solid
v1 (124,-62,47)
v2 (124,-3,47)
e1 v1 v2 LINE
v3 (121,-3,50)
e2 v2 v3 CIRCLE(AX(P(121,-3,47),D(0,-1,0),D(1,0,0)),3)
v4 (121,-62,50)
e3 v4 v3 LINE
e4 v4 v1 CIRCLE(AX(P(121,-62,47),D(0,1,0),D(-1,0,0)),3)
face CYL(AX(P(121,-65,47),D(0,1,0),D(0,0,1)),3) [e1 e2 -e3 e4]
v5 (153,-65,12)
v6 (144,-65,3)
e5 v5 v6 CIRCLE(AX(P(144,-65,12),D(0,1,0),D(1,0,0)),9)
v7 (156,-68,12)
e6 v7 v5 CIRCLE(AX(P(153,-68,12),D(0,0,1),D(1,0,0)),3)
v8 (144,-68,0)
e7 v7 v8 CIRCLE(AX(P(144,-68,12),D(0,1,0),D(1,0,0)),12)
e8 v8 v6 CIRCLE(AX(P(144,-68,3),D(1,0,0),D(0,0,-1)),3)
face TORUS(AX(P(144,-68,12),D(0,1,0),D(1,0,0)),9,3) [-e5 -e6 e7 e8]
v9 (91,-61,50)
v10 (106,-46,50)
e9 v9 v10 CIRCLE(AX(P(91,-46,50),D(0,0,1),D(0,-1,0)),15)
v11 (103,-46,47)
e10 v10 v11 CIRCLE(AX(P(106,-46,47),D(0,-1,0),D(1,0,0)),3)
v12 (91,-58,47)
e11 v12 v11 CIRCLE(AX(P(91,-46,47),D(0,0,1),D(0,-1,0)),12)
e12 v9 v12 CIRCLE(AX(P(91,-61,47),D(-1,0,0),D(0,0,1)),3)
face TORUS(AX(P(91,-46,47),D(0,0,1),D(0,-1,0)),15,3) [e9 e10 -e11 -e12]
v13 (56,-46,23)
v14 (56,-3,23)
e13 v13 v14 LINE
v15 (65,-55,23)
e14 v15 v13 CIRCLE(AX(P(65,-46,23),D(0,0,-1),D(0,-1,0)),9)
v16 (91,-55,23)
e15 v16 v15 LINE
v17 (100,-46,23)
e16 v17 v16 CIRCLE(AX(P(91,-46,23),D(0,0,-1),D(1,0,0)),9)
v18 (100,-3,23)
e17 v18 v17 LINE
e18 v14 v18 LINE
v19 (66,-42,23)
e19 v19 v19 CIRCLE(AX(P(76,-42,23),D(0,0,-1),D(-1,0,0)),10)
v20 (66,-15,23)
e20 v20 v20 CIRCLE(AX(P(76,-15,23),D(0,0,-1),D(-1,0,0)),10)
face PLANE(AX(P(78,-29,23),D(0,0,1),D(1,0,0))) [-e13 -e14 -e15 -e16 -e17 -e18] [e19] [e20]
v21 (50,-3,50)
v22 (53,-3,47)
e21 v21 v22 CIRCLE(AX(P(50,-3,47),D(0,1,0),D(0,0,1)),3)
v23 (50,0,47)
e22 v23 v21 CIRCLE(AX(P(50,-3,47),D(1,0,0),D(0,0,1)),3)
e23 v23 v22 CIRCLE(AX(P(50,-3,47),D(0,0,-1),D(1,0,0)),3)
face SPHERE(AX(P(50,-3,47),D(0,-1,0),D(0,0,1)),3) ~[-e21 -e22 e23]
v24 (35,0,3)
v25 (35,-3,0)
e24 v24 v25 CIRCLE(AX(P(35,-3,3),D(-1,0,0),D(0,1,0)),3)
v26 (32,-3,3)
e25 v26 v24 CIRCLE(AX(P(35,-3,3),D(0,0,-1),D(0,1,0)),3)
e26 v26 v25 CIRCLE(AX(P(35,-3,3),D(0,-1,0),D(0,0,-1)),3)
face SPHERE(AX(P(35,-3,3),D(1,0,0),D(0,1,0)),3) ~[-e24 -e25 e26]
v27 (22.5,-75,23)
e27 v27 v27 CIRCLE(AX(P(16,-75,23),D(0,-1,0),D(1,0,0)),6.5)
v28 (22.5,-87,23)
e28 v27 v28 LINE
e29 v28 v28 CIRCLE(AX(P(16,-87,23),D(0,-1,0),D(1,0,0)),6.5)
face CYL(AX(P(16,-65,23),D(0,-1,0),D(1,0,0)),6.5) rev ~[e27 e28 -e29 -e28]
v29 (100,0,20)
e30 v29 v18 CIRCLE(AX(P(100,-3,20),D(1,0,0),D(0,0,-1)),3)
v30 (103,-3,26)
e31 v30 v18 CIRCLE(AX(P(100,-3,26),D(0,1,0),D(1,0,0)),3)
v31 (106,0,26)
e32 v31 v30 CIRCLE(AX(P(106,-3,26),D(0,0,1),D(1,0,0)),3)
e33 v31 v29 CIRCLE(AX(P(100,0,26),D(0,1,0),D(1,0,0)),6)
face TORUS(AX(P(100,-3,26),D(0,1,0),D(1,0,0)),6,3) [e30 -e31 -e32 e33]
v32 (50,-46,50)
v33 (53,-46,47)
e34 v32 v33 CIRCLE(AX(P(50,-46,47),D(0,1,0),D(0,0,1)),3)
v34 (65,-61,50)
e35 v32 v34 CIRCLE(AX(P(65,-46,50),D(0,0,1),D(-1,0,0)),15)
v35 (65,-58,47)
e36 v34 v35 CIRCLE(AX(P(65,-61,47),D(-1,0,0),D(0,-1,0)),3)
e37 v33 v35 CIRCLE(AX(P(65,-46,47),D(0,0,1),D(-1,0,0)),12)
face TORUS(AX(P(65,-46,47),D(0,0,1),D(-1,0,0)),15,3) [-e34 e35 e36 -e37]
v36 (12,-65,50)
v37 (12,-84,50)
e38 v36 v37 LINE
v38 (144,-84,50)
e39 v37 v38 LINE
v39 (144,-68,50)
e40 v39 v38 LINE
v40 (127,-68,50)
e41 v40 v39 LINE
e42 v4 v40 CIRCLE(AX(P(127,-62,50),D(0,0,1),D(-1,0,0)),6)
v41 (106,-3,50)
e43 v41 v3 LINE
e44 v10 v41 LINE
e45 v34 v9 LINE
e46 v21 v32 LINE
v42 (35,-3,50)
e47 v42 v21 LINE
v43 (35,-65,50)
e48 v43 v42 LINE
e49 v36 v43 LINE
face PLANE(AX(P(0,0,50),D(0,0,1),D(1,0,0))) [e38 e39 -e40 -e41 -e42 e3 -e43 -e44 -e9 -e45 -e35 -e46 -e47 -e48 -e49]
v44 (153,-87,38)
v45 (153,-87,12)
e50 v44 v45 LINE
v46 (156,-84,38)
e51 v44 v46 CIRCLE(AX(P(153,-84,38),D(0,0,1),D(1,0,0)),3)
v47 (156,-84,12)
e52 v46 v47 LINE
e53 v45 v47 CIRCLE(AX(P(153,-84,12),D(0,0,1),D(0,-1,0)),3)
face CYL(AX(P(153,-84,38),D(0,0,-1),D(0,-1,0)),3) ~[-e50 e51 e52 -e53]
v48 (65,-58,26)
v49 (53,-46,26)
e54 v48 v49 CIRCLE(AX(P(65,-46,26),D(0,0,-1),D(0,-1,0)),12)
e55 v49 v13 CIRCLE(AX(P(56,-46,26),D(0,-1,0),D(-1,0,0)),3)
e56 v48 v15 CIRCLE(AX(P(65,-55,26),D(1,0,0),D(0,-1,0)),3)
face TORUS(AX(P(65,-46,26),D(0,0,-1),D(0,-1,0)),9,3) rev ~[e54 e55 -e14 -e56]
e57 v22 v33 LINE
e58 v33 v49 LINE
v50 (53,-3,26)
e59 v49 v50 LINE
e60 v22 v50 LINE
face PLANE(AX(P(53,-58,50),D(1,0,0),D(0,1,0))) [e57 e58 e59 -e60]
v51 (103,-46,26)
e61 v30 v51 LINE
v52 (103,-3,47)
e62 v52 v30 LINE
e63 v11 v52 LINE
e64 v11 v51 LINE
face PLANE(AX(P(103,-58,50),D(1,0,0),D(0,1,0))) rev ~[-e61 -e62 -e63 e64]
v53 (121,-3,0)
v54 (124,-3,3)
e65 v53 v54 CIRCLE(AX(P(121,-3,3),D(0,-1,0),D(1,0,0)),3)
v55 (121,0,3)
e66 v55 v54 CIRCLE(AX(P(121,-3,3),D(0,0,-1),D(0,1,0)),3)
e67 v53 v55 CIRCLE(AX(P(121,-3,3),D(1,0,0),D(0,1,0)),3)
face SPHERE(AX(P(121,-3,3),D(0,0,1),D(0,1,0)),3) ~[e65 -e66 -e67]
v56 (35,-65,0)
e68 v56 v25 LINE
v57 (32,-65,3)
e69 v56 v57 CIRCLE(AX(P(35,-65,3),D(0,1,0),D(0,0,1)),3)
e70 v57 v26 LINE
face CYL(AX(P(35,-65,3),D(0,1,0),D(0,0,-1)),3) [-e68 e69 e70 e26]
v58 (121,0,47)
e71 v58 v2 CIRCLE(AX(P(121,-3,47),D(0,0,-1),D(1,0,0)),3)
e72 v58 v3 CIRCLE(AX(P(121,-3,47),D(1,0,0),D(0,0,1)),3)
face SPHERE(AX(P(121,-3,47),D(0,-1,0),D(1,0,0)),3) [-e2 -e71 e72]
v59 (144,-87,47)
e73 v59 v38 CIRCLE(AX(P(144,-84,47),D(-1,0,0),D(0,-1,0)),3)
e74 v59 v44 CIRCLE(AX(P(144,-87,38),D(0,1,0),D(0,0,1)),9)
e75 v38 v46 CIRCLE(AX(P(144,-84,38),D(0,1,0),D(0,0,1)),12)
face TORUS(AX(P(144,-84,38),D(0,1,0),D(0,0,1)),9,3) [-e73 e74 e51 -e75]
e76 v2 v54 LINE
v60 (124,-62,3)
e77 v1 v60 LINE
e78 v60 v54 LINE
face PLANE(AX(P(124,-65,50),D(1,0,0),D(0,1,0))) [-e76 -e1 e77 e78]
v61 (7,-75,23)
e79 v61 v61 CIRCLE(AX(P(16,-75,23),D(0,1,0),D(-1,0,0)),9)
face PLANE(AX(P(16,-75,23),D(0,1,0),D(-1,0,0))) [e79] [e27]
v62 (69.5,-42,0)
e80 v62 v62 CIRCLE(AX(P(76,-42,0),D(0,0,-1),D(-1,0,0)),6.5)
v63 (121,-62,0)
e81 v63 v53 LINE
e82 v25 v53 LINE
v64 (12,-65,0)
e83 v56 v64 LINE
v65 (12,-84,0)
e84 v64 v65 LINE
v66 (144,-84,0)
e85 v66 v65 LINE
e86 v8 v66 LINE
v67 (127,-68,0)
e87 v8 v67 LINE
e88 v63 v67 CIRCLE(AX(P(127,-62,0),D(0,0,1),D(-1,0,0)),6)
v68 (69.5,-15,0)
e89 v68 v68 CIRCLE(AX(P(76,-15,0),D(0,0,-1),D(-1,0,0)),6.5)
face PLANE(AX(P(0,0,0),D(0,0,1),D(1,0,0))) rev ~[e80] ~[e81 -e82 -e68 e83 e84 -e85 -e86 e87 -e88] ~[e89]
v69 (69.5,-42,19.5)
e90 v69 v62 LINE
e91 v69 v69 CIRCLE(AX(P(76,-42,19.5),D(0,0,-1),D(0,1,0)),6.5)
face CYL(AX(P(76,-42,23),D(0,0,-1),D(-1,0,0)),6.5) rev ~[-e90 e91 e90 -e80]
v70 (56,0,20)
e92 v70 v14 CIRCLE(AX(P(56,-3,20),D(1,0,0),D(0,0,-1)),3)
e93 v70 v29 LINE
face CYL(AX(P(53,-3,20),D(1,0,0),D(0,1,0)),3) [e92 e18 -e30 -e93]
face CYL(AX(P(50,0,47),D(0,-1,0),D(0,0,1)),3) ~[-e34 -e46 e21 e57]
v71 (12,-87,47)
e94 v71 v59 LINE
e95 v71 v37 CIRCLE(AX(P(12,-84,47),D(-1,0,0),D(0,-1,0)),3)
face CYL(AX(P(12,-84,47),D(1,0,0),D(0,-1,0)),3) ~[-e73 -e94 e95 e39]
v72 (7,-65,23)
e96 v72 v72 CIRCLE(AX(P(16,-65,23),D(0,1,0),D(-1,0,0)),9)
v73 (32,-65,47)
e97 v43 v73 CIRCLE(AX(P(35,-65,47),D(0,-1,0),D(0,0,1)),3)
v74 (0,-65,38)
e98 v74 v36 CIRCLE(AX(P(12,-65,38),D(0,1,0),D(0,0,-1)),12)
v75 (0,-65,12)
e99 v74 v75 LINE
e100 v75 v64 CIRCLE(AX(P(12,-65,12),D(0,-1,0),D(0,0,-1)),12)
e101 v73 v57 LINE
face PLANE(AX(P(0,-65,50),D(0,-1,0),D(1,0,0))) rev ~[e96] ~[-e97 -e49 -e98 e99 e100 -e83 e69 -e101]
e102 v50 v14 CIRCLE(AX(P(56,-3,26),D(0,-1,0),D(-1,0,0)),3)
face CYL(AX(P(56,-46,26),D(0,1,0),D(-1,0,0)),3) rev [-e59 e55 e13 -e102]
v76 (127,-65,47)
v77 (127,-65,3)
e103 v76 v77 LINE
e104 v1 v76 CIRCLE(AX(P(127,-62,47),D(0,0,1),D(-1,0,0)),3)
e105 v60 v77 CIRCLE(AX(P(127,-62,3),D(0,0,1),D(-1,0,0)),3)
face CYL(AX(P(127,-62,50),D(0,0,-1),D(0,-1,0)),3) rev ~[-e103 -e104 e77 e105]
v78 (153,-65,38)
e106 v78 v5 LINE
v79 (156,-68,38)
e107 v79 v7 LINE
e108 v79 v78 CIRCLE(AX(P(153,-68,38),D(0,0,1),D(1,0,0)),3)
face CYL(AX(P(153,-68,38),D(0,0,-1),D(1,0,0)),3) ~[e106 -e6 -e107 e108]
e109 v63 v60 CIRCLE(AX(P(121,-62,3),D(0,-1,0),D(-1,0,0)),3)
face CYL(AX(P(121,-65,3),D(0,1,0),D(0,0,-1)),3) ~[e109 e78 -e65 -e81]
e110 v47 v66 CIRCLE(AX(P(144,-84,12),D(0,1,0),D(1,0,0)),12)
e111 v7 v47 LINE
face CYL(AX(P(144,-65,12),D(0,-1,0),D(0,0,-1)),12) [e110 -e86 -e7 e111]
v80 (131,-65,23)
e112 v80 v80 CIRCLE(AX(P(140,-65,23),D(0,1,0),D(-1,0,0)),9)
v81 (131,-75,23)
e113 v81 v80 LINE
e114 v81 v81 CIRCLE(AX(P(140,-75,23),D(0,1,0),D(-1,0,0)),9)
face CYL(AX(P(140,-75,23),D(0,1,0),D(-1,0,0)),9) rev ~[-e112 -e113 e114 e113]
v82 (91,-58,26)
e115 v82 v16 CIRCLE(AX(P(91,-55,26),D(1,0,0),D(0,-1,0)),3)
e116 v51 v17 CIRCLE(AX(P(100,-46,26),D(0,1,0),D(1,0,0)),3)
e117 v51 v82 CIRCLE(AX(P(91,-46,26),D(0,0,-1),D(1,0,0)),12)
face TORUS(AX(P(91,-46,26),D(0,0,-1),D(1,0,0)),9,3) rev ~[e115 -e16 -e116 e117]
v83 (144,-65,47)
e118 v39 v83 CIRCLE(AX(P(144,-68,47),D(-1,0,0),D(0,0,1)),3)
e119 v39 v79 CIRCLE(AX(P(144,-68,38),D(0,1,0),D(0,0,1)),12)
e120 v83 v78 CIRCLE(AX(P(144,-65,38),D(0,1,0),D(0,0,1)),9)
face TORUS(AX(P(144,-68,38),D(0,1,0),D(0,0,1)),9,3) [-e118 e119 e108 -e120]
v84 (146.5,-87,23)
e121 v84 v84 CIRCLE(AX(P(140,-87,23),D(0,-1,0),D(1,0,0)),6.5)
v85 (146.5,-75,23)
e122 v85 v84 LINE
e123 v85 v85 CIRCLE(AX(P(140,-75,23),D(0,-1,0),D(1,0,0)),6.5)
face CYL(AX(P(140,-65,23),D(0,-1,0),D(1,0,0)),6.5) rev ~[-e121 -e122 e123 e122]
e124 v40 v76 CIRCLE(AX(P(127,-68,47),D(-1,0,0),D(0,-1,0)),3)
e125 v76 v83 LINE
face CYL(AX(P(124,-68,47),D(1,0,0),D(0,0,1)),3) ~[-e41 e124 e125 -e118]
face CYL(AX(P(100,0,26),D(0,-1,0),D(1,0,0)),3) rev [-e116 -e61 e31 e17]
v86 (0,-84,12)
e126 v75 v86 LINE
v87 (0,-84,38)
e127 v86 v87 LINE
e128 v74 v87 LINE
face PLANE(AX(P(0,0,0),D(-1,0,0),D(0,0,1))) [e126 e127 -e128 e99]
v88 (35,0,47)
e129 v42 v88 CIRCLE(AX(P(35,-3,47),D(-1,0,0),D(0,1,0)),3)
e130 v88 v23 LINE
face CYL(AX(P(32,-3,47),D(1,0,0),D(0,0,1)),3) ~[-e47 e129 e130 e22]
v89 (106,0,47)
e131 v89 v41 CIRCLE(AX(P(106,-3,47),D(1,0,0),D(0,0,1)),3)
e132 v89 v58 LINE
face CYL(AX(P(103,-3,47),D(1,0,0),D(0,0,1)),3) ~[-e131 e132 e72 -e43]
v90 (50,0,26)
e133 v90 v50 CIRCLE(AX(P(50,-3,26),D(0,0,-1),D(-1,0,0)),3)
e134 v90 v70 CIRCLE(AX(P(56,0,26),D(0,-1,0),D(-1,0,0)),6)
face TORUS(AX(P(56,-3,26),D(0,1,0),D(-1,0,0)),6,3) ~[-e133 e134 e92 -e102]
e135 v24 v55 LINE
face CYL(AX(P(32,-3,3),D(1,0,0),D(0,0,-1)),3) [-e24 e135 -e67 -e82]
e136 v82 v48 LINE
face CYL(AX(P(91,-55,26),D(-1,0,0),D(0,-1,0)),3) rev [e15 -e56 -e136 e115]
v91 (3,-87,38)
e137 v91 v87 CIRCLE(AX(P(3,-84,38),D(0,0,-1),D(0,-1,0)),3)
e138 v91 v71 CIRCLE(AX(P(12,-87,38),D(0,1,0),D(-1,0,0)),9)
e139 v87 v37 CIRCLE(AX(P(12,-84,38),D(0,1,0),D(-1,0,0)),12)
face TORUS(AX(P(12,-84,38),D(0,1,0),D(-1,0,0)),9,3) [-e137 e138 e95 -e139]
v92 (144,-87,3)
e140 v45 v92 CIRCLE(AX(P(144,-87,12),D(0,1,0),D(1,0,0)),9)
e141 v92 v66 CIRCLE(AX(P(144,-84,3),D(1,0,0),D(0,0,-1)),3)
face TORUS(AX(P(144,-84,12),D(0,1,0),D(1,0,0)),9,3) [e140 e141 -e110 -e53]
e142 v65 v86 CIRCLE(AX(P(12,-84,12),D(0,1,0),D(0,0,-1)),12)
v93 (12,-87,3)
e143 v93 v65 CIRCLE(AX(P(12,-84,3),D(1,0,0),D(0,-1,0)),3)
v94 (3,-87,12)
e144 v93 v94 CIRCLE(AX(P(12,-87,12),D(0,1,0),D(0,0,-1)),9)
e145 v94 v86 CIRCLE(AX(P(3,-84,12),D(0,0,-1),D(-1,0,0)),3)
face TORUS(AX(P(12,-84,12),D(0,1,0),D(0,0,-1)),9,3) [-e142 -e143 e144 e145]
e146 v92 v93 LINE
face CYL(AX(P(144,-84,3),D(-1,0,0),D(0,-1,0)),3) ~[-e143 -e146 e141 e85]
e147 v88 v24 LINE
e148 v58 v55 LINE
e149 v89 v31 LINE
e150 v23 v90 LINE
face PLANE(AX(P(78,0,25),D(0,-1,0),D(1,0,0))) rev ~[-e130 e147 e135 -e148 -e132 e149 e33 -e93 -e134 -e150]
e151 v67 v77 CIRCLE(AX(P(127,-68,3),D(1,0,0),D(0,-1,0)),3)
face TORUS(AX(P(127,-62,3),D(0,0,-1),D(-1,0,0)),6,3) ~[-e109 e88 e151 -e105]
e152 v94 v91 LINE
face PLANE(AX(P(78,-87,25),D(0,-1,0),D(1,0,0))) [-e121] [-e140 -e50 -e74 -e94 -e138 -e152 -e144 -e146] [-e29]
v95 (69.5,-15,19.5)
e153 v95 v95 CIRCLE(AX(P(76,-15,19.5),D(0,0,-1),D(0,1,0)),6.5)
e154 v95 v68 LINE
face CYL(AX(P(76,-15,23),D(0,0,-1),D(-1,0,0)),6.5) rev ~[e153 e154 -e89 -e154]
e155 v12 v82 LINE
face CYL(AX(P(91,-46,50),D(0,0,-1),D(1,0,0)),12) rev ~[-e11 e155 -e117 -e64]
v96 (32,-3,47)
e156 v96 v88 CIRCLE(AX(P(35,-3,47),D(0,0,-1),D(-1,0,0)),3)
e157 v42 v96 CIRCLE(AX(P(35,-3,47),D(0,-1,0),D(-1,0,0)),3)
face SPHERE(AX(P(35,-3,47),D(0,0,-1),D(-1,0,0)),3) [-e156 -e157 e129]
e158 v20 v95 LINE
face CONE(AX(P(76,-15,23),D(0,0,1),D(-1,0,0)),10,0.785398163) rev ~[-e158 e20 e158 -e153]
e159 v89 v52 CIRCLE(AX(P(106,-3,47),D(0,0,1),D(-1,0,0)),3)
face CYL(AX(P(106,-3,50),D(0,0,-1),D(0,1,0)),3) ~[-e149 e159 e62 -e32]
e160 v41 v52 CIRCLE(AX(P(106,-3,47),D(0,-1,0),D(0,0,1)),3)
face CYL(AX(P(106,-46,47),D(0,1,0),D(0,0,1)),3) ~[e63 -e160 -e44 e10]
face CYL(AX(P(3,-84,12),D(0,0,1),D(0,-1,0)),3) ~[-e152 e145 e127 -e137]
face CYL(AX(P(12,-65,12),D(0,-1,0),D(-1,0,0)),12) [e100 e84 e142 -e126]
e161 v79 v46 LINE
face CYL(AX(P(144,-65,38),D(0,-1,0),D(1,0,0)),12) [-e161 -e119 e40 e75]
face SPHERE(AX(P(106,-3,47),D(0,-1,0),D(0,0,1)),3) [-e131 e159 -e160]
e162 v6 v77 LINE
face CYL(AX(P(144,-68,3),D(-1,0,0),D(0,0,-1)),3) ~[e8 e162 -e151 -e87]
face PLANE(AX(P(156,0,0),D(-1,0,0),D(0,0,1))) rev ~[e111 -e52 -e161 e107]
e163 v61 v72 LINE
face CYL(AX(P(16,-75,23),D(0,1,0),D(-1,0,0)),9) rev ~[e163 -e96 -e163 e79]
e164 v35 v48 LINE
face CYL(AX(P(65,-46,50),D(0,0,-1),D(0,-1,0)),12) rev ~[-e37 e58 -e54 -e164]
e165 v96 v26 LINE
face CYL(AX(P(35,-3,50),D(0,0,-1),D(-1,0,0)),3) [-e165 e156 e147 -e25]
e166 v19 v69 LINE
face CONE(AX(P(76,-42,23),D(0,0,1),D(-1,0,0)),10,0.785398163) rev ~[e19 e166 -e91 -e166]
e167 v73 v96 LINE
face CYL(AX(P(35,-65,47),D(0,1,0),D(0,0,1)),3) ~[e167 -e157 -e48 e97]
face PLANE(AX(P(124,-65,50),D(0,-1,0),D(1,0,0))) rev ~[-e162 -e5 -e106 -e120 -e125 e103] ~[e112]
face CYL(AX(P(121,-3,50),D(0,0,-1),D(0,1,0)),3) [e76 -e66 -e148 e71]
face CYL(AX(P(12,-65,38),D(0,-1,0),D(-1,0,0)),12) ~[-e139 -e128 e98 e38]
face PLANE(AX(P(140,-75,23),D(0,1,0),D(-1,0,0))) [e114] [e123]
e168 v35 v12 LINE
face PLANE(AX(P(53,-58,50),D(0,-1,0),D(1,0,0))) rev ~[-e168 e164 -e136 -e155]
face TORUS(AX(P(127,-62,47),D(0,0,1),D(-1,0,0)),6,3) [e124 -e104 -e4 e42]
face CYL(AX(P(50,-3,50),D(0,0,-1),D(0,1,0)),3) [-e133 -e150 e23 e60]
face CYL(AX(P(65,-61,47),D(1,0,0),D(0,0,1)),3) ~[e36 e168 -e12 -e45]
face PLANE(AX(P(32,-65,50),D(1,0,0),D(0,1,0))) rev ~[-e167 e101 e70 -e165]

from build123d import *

# Parameters (mm, degrees)
F0_W           = 156
F0_H           = 50
F1_DEPTH       = 87
F2_W           = 32
F2_H           = 65
F3_DEPTH       = 50
F4_W           = 50
F4_H           = 58
F5_DEPTH       = 27
F7_D           = 13
F7_CBORE_D     = 18
F7_CBORE_DEPTH = 10
F9_D           = 13
F9_CSINK_D     = 20
F9_CSINK_ANGLE = 90
F10_R          = 12
F11_R          = 3


with BuildPart() as f1:
    # F0 (on Front) → F1 (new body)
    with BuildSketch(Plane.XZ):
        with Locations((78, 25)):
            Rectangle(F0_W, F0_H)
    extrude(amount=F1_DEPTH)

    # F2 (on face) → F3 (cut, through all)
    with BuildSketch(Plane.XY.offset(50)):
        with Locations((16, -32.5)):
            Rectangle(F2_W, F2_H)
        with Locations((140, -32.5)):
            Rectangle(F2_W, F2_H)
    extrude(amount=-F3_DEPTH, mode=Mode.SUBTRACT)

    # F4 (on face) → F5 (cut)
    with BuildSketch(Plane.XY.offset(50)):
        with Locations((78, -29)):
            Rectangle(F4_W, F4_H)
    extrude(amount=-F5_DEPTH, mode=Mode.SUBTRACT)

    # F7 (through all)
    with Locations(Plane(origin=(0, -65, 0), x_dir=(-1, 0, 0), z_dir=(0, 1, 0))):
        with Locations((-140, 23), (-16, 23)):
            CounterBoreHole(F7_D / 2, F7_CBORE_D / 2, F7_CBORE_DEPTH)

    # F9 (through all)
    with Locations(Plane.XY.offset(23)):
        with Locations((76, -15), (76, -42)):
            CounterSinkHole(F9_D / 2, F9_CSINK_D / 2, counter_sink_angle=F9_CSINK_ANGLE)

    # F10
    f10_edges = [f1.edges().sort_by_distance(p)[0] for p in [
        (156, -76, 50),
        (156, -76, 0),
        (0, -76, 50),
        (0, -76, 0),
        (103, -58, 36.5),
        (53, -58, 36.5),
    ]]
    fillet(f10_edges, radius=F10_R)

    # F11
    f11_edges = [f1.edges().sort_by_distance(p)[0] for p in [
        (78, -87, 50),
        (78, -58, 50),
        (53, -23, 50),
        (103, -23, 50),
        (56.514719, -54.485281, 50),
        (99.485281, -54.485281, 50),
        (124, -32.5, 50),
        (134, -65, 50),
        (124, -65, 25),
        (124, 0, 25),
        (78, 0, 23),
        (53, -23, 23),
        (56.514719, -54.485281, 23),
        (78, 0, 0),
        (32, 0, 25),
        (32, -32.5, 50),
        (78, -87, 0),
        (32, -32.5, 0),
        (113.5, 0, 50),
        (42.5, 0, 50),
        (124, -32.5, 0),
        (0, -87, 25),
        (3.514719, -87, 46.485281),
        (3.514719, -87, 3.514719),
        (152.485281, -87, 46.485281),
        (152.485281, -87, 3.514719),
        (156, -87, 25),
        (134, -65, 0),
        (152.485281, -65, 46.485281),
        (152.485281, -65, 3.514719),
        (156, -65, 25),
        (103, 0, 36.5),
        (103, -23, 23),
        (99.485281, -54.485281, 23),
        (53, 0, 36.5),
        (78, -58, 23),
    ]]
    fillet(f11_edges, radius=F11_R)


solid = f1.part
